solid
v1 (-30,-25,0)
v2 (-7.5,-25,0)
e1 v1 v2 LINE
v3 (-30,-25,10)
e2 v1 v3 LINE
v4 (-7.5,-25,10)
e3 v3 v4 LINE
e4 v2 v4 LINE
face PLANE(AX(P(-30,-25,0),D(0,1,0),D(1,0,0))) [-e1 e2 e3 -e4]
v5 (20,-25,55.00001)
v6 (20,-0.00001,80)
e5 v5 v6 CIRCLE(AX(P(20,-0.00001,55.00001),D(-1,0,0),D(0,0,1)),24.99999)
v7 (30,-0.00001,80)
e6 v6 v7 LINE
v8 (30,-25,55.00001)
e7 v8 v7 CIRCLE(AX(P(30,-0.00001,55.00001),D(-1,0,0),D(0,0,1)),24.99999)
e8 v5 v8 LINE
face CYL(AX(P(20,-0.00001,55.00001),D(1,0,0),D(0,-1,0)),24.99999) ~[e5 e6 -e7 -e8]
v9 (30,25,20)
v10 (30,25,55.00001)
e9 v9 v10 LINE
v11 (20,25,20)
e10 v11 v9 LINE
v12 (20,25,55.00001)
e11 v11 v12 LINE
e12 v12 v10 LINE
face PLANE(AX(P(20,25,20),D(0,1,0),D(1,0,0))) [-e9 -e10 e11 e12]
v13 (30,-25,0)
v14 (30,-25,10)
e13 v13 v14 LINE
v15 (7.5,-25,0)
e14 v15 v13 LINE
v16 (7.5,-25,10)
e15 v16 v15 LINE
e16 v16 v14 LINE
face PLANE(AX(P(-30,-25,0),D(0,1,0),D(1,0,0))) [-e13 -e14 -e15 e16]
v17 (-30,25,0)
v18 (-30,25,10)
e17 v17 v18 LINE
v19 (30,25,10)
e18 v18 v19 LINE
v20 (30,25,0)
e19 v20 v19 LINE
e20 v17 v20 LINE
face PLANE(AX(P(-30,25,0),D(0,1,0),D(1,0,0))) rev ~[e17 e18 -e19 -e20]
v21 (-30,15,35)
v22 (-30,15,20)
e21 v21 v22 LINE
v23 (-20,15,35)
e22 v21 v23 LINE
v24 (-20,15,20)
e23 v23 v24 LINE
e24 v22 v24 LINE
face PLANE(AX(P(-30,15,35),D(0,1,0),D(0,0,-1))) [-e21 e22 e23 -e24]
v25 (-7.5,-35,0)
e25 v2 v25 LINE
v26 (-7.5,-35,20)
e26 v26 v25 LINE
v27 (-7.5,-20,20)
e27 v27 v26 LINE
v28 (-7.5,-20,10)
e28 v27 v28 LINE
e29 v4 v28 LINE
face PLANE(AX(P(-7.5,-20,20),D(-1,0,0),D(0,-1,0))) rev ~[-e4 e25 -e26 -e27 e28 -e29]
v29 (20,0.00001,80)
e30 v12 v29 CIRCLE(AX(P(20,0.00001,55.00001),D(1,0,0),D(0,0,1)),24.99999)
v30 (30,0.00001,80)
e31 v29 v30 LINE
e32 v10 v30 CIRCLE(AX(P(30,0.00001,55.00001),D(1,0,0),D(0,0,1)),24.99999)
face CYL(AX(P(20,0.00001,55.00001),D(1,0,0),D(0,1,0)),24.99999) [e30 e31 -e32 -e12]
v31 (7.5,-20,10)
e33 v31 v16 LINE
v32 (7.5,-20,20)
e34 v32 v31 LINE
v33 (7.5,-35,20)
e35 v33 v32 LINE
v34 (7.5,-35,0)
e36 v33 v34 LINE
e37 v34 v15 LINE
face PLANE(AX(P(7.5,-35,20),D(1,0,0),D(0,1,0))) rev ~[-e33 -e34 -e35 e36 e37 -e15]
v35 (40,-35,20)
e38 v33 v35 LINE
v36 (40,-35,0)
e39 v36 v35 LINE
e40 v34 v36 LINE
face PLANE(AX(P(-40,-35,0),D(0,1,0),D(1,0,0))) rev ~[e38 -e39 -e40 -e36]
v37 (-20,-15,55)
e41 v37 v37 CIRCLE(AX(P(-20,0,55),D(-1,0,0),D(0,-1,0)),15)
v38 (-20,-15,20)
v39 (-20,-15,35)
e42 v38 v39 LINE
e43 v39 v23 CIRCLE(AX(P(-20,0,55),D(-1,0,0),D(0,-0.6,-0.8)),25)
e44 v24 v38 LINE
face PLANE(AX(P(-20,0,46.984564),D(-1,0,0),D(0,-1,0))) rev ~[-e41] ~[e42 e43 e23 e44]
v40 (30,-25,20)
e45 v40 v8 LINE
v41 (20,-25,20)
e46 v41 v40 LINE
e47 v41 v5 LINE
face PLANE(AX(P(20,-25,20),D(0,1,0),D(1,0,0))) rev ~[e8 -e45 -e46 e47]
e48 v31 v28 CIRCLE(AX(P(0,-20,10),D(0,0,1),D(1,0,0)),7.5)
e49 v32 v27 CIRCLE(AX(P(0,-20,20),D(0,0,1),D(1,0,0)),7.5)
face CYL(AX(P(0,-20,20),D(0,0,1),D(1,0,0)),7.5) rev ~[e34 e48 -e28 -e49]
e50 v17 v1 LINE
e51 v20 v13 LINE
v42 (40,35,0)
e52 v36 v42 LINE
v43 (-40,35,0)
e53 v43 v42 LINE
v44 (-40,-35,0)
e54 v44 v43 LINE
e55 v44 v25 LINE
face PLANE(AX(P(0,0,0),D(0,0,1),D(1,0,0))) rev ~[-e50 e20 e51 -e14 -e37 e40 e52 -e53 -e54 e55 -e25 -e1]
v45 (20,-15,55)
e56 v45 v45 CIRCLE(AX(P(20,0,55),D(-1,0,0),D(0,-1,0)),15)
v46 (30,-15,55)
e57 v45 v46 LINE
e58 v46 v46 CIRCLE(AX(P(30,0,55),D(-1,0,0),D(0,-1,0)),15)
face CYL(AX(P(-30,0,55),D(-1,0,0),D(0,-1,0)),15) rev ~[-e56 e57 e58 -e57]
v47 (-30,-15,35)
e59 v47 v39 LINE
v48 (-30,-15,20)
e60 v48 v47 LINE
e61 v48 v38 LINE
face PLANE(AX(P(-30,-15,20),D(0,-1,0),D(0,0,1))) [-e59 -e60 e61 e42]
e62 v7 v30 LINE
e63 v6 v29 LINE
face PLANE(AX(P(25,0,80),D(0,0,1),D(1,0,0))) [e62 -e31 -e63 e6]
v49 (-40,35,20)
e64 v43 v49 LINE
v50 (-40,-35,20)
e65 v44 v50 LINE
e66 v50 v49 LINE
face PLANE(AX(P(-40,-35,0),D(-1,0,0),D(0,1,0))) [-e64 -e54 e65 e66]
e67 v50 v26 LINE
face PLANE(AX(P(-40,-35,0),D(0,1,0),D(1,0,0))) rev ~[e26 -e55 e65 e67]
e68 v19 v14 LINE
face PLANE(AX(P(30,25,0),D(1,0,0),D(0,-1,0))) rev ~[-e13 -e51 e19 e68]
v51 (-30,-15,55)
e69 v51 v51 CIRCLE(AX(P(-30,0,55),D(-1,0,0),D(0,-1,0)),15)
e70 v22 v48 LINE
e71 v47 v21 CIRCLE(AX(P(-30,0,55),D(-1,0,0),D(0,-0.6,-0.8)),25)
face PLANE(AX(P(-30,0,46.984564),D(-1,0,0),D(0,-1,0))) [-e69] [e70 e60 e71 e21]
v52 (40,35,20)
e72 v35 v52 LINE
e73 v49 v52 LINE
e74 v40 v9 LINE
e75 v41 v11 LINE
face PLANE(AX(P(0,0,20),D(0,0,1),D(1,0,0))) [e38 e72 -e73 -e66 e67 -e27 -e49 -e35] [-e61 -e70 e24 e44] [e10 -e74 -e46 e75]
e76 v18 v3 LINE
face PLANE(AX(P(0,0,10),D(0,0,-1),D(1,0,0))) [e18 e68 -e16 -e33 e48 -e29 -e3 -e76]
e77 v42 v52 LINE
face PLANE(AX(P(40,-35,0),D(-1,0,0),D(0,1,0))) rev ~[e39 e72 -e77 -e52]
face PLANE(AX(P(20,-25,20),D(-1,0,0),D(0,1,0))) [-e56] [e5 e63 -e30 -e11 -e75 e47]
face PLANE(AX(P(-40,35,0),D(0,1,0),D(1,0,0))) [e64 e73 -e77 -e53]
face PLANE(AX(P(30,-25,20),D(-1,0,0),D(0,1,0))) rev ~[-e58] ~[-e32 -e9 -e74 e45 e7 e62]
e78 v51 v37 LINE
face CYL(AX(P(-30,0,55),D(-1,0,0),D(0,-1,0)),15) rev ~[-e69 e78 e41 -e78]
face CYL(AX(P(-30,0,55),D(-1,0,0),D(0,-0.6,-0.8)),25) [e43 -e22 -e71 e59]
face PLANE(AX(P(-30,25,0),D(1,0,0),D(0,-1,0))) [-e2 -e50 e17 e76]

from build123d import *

# Parameters (mm, degrees)
F0_W      = 80
F0_H      = 70
F1_DEPTH  = 20
F2_W      = 60
F2_H      = 50
F3_DEPTH  = 10
F5_DEPTH  = 20.001
F6_W      = 10
F6_H      = 50
F7_DEPTH  = 60
F8_R      = 24.99999
F11_DEPTH = 10
F12_R     = 15
F13_DEPTH = 70.001


# Not quite as in the source:
# - a fillet or chamfer is up to 0.001 mm smaller than in the source, because OpenCascade refuses the exact size


with BuildPart() as f1:
    # F0 (on Top) → F1 (new body)
    with BuildSketch(Plane.XY):
        Rectangle(F0_W, F0_H)
    extrude(amount=F1_DEPTH)

    # F2 (on face) → F3 (cut)
    with BuildSketch(Plane(origin=(0, 0, 0), x_dir=(1, 0, 0), z_dir=(0, 0, -1))):
        Rectangle(F2_W, F2_H)
    extrude(amount=-F3_DEPTH, mode=Mode.SUBTRACT)

    # F4 (on face) → F5 (cut, through all)
    with BuildSketch(Plane.XY.offset(20)):
        with BuildLine():
            Line((7.5, -35), (7.5, -20))
            ThreePointArc((7.5, -20), (0, -12.5), (-7.5, -20))
            Line((-7.5, -20), (-7.5, -35))
            Line((-7.5, -35), (7.5, -35))
        make_face()
    extrude(amount=-F5_DEPTH, mode=Mode.SUBTRACT)

    # F6 (on face) → F7 (join)
    with BuildSketch(Plane.XY.offset(20)):
        with Locations((25, 0)):
            Rectangle(F6_W, F6_H)
    extrude(amount=F7_DEPTH)

    # F8 (radius 25 in the source; OpenCascade refuses exactly that, so slightly less here)
    f8_edges = [f1.edges().sort_by_distance(p)[0] for p in [
        (25, -25, 80),
        (25, 25, 80),
    ]]
    fillet(f8_edges, radius=F8_R)

    # F10 (on offset) → F11 (join)
    with BuildSketch(Plane(origin=(-30, 0, 0), x_dir=(0, -1, 0), z_dir=(-1, 0, 0))):
        with BuildLine():
            Line((15, 20), (15, 35))
            ThreePointArc((15, 35), (0, 80), (-15, 35))
            Line((-15, 35), (-15, 20))
            Line((-15, 20), (15, 20))
        make_face()
    extrude(amount=-F11_DEPTH)

    # F12 (on face) → F13 (cut, through all)
    with BuildSketch(Plane(origin=(-30, 0, 0), x_dir=(0, -1, 0), z_dir=(-1, 0, 0))):
        with Locations((0, 55)):
            Circle(F12_R)
    extrude(amount=-F13_DEPTH, mode=Mode.SUBTRACT)


solid = f1.part
